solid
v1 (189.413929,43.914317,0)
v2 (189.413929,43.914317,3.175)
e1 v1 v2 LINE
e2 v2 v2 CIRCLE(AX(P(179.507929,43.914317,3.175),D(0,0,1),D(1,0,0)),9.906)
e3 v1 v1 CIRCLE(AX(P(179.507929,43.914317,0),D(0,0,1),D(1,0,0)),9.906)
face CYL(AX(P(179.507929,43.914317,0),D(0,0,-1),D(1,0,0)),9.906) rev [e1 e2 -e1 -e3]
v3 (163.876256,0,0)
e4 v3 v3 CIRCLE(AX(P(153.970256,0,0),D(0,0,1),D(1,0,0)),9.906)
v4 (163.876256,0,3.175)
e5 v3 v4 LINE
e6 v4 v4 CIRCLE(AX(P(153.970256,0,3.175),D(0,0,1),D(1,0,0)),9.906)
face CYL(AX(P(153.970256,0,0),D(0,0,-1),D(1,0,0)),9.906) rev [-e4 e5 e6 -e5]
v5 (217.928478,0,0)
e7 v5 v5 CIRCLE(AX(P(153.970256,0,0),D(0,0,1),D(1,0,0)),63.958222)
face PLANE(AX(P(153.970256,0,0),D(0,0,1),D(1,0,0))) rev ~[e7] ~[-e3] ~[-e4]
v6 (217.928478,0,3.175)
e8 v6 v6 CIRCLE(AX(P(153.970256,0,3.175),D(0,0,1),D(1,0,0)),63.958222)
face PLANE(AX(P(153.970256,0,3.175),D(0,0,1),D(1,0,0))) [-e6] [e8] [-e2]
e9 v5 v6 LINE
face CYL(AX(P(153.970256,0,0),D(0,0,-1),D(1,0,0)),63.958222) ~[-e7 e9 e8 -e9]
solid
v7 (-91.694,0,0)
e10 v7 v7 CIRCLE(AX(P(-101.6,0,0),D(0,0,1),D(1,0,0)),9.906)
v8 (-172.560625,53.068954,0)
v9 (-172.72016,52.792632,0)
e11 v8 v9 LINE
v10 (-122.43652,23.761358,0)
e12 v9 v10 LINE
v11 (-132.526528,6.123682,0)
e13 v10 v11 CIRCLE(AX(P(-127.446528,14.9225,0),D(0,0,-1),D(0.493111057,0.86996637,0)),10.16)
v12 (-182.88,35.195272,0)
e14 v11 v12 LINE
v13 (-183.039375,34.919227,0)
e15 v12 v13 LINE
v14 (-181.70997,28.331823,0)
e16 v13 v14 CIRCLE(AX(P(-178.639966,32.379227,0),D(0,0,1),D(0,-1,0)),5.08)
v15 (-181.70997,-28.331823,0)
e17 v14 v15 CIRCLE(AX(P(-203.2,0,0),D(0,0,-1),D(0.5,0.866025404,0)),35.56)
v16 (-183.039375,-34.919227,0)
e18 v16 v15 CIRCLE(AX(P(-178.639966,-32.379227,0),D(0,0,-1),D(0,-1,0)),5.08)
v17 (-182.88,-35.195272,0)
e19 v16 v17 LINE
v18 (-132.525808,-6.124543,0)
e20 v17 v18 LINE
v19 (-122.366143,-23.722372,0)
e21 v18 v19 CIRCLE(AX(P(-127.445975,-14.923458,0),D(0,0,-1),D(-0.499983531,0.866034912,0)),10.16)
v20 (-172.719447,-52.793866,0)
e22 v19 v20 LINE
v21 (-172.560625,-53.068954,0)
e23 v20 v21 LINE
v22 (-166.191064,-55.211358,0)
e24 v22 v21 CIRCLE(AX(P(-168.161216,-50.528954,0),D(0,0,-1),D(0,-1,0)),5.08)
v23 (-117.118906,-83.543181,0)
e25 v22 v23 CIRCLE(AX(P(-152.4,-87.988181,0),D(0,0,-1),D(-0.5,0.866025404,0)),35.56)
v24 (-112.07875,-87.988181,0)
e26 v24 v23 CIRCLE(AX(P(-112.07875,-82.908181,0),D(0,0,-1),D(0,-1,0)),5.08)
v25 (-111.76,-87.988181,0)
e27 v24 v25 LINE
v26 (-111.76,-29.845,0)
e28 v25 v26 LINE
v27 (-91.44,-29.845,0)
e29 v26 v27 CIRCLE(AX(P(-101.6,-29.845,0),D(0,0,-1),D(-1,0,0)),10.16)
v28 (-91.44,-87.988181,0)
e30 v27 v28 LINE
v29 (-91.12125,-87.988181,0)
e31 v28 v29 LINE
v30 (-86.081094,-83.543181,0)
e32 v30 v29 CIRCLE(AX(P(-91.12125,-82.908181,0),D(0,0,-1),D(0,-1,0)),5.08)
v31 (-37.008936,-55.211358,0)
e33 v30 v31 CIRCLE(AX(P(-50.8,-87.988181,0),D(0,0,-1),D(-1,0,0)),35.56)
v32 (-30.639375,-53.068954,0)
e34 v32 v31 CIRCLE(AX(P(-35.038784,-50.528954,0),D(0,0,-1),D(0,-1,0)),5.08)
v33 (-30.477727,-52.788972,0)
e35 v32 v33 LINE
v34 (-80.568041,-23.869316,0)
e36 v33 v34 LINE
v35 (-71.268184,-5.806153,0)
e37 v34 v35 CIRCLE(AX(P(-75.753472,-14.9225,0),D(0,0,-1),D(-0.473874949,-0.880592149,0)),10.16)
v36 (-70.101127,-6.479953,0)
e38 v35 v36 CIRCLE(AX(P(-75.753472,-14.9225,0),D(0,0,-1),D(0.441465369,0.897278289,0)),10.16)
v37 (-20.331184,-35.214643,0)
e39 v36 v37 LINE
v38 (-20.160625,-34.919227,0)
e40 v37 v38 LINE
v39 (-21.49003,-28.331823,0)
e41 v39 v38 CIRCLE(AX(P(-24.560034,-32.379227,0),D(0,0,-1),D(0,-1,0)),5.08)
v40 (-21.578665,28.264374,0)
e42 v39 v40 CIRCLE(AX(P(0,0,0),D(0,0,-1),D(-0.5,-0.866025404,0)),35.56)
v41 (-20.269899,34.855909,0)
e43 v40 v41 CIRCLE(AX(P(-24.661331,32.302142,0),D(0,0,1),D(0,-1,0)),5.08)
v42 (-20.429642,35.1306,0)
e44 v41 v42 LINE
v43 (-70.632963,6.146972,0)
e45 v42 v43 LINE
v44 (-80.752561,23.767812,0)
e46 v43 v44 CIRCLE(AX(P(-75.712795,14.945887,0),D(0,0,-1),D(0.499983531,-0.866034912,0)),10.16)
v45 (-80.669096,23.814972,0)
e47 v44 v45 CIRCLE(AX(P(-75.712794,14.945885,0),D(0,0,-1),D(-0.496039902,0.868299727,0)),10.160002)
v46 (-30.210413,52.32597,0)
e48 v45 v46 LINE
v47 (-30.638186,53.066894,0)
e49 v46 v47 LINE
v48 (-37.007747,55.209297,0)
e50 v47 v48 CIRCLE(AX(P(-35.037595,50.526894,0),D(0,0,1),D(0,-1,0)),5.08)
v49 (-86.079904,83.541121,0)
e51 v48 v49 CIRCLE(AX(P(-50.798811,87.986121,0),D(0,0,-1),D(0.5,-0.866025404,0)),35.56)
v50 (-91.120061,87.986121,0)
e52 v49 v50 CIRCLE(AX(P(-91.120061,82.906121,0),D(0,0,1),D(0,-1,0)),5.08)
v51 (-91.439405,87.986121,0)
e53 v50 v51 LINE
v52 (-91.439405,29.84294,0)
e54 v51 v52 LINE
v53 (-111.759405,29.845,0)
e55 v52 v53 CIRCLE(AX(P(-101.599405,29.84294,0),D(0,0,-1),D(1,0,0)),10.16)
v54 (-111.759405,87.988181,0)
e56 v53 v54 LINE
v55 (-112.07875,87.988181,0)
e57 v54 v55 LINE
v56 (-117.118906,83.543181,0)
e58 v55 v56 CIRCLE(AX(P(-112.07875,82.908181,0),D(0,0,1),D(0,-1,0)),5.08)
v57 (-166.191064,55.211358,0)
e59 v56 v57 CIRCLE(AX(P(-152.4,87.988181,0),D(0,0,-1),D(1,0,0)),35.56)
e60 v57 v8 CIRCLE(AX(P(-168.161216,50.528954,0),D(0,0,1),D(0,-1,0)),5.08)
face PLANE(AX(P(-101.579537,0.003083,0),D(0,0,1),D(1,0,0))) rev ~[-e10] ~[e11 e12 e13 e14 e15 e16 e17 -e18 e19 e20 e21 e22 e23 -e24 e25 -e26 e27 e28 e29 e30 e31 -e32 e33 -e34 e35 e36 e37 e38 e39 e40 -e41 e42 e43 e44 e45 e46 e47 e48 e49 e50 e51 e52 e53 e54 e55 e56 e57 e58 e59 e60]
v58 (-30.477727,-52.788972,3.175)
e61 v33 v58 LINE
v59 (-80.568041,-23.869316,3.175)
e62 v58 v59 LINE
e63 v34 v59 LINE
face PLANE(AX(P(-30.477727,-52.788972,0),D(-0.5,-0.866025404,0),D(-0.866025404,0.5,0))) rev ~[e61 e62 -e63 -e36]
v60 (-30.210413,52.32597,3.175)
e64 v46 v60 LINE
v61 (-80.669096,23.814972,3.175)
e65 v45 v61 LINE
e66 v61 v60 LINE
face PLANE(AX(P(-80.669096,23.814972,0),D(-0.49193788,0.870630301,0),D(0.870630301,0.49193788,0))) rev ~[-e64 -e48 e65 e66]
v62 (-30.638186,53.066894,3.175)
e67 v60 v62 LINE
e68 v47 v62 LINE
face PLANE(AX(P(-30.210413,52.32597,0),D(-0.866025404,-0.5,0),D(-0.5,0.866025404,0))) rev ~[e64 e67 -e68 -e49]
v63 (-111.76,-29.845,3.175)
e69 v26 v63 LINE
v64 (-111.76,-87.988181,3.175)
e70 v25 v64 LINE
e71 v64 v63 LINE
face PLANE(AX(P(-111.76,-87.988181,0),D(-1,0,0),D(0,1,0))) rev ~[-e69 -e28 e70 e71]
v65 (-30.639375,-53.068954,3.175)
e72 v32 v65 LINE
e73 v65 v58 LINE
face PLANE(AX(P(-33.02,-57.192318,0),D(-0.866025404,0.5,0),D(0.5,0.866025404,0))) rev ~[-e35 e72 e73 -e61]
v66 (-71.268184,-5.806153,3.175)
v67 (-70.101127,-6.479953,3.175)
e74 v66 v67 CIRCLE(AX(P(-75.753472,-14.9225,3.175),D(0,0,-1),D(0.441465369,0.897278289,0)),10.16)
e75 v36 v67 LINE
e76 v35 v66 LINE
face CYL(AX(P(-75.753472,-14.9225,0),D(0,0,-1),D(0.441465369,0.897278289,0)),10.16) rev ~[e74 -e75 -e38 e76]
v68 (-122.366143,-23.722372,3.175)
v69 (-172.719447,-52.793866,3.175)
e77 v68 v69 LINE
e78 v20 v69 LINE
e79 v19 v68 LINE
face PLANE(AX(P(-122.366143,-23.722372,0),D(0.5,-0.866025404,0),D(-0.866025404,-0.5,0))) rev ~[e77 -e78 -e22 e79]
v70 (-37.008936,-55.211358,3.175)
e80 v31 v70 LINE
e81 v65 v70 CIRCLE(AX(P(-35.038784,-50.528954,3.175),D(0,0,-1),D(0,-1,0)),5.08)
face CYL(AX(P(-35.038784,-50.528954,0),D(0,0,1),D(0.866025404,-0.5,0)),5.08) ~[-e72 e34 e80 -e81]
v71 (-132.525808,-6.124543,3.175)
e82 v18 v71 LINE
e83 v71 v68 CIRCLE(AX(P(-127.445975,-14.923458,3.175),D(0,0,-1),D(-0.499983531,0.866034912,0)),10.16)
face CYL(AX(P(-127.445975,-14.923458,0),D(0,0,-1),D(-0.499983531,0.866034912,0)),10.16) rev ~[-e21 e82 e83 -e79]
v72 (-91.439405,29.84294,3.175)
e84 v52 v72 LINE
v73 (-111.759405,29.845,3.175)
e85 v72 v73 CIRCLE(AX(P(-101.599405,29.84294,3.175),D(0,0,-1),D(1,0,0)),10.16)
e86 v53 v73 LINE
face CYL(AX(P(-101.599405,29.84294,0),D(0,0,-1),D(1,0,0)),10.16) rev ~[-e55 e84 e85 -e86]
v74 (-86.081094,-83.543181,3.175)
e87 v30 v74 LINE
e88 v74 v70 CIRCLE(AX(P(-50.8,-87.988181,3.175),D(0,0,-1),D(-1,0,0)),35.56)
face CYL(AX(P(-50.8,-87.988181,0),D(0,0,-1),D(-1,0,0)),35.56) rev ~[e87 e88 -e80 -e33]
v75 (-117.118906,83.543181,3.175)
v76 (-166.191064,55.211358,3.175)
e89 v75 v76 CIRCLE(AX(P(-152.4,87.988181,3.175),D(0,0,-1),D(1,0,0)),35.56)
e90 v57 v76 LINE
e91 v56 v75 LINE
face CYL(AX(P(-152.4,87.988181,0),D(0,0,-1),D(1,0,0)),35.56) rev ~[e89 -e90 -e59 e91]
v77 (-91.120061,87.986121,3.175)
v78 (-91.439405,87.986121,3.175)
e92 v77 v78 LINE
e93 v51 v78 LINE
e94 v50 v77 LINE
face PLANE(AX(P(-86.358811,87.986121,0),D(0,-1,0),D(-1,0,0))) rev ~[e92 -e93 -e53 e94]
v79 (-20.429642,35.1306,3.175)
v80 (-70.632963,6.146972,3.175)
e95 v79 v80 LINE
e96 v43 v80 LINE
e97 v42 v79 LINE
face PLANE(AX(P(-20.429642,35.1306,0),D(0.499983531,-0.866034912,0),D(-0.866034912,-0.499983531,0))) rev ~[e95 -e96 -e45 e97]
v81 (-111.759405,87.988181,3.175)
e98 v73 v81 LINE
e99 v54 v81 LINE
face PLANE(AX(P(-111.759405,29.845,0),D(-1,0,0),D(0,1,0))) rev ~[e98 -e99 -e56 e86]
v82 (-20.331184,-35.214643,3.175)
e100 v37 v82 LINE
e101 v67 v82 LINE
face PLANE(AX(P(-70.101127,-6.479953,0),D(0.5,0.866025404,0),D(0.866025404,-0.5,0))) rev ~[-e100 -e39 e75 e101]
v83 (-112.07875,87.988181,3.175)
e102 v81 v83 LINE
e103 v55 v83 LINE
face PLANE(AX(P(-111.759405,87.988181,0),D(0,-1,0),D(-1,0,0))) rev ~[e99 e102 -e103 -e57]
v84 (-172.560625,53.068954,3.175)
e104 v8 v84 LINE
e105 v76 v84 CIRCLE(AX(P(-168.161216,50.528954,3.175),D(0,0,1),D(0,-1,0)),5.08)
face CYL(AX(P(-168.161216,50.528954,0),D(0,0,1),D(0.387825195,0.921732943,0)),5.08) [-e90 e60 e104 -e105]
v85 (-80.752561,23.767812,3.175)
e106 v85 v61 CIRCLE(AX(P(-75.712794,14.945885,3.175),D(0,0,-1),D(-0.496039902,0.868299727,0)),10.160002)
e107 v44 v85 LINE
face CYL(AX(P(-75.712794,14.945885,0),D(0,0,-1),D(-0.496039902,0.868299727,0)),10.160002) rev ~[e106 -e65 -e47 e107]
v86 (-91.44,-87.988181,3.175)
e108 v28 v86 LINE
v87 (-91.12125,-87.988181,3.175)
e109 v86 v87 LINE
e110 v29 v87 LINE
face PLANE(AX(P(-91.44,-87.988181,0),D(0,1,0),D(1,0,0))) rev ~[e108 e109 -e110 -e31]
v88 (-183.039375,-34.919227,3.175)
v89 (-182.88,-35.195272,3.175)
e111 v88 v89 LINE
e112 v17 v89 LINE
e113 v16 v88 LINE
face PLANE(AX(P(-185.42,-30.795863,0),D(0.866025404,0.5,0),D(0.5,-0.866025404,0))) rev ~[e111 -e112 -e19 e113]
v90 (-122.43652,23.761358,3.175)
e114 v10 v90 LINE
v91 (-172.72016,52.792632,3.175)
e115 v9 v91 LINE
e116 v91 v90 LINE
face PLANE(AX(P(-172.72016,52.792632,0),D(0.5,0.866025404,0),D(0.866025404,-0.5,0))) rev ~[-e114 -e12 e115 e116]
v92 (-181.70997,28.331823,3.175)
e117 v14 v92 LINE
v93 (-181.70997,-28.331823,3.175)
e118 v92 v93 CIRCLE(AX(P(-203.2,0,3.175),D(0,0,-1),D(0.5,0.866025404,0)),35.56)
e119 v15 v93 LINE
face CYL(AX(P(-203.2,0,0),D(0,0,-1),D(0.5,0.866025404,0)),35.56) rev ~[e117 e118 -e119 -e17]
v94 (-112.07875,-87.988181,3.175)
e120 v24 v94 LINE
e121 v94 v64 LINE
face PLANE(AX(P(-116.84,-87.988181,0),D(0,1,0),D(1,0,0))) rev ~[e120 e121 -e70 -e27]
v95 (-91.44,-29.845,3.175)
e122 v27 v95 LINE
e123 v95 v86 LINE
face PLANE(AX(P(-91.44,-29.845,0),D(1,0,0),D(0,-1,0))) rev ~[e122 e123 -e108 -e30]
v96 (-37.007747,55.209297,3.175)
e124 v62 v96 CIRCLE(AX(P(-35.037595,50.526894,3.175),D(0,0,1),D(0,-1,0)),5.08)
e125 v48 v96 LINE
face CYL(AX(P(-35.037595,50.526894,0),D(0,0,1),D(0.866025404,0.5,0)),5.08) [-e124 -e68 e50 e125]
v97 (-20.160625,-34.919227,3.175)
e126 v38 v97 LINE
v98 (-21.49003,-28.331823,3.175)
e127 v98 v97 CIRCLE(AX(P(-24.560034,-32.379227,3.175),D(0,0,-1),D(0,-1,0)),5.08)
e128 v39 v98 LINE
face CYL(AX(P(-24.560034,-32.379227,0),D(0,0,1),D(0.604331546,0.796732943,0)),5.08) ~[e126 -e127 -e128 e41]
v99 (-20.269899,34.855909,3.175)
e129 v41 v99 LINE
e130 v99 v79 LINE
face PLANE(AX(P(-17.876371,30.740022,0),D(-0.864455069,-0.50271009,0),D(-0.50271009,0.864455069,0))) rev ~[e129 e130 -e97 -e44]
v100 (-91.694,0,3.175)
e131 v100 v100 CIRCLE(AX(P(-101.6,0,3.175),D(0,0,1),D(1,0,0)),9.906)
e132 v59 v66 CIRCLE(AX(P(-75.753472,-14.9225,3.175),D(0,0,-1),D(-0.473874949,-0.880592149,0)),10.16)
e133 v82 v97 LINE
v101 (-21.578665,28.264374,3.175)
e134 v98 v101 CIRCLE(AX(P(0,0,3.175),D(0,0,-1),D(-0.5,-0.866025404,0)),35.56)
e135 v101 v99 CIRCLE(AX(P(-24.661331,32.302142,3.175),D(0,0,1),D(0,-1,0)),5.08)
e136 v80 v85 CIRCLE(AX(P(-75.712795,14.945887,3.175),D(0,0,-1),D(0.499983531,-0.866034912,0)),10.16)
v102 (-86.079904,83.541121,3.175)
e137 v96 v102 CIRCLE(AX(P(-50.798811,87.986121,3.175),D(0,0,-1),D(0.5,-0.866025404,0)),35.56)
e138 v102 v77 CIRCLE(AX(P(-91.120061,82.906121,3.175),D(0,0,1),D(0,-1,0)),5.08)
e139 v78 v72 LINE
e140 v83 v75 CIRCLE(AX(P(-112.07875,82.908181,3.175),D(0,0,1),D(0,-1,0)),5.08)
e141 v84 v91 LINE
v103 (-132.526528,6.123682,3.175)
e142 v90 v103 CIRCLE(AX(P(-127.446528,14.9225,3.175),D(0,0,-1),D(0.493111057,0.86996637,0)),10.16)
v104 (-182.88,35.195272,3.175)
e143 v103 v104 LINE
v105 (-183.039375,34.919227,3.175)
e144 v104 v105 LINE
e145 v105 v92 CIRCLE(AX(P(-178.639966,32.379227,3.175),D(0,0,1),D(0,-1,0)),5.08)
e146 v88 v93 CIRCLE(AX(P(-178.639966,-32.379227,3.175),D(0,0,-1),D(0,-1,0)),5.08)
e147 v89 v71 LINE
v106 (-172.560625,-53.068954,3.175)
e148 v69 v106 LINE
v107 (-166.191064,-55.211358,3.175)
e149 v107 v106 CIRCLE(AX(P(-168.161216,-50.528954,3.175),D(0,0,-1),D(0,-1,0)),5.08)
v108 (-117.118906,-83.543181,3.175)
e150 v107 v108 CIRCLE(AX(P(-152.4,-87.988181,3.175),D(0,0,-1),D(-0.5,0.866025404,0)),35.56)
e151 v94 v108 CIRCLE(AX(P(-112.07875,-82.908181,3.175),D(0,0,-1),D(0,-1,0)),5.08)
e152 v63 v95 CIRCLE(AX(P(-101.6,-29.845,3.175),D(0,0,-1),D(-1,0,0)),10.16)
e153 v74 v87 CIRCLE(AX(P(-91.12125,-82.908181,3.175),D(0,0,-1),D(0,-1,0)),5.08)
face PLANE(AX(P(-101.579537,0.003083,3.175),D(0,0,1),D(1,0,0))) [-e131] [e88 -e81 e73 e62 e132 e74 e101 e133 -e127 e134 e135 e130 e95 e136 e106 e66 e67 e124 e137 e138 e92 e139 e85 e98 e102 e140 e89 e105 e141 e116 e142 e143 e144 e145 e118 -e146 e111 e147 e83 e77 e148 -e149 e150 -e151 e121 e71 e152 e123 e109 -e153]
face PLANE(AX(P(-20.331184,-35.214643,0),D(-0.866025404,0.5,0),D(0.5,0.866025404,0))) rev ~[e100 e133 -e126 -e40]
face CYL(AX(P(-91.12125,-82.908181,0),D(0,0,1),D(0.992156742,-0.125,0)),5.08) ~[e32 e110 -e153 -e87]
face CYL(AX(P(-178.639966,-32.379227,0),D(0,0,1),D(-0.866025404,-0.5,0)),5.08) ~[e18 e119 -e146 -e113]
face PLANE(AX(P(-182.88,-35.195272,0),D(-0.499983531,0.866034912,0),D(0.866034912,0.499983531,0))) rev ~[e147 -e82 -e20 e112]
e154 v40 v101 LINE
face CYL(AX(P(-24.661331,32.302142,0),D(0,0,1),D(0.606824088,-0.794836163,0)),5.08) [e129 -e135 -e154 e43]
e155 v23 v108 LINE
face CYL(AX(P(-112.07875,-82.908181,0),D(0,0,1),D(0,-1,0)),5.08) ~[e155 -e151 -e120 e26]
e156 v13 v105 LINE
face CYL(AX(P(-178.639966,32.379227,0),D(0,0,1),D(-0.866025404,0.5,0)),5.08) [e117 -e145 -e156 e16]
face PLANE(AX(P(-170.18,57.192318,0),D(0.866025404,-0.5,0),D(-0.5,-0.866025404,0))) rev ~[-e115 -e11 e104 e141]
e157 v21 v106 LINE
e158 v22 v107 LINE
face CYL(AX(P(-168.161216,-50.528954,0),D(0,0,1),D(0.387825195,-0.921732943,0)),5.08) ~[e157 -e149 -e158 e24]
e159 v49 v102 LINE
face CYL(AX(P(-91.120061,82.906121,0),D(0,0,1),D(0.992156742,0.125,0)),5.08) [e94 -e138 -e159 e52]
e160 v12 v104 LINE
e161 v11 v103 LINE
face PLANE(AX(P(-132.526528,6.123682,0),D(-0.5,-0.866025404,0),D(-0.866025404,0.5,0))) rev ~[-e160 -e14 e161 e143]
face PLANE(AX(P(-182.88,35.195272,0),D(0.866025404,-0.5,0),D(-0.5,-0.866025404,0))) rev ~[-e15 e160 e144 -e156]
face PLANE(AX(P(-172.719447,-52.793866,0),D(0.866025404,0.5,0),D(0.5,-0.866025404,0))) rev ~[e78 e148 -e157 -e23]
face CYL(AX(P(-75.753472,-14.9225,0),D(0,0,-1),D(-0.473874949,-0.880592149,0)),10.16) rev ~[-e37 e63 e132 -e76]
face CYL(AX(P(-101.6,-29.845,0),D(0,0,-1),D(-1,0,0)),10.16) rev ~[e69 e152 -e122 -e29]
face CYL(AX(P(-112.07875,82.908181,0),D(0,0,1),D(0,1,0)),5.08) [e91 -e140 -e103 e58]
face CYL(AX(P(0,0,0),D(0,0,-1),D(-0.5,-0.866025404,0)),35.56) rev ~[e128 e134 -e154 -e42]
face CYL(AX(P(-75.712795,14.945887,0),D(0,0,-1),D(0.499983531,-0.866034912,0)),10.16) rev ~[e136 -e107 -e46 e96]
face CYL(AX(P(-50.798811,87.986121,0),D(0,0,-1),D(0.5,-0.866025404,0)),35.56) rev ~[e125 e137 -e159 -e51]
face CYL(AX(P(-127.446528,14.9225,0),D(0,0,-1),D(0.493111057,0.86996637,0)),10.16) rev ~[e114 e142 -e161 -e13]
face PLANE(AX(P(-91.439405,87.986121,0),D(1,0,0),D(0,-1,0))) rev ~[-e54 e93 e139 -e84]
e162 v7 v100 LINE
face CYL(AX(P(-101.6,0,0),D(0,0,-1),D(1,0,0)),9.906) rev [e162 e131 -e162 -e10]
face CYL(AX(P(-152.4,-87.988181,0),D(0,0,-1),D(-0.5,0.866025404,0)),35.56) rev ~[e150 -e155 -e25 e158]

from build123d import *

# Parameters (mm, degrees)
F0_R     = 9.906
F1_DEPTH = 3.175
F2_R     = 5.08
F0_R_2   = 63.9582216699
F0_R_3   = 33.02
F3_DEPTH = 3.175


# Not quite as in the source:
# - a length typed as a fraction of an inch, garbled in the dataset ("3 / 203.2 mm" for 3/8 in), is restored
# - a feature names something its author has since deleted; it is built from what else it names


with BuildPart() as f1:
    # F0 (on Top) → F1 (new body)
    with BuildSketch(Plane.XY):
        with BuildLine():
            ThreePointArc((-17.78, -30.7958633586), (-35.5599563921, -0.0556901267), (-17.8763707949, 30.7400222382))
            Line((-17.8763707949, 30.7400222382), (-20.4296415334, 35.1306001794))
            Line((-20.4296415334, 35.1306001794), (-70.6329627114, 6.1469720917))
            ThreePointArc((-70.6329627114, 6.1469720917), (-84.5232381264, 9.8860746707), (-80.7525608015, 23.7678120156))
            ThreePointArc((-80.7525608015, 23.7678120156), (-80.7108842522, 23.7914906594), (-80.6690964546, 23.8149724163))
            Line((-80.6690964546, 23.8149724163), (-30.2104125797, 52.3259695061))
            Line((-30.2104125797, 52.3259695061), (-33.0188105519, 57.1902574851))
            ThreePointArc((-33.0188105519, 57.1902574851), (-68.5788105527, 57.1902574837), (-86.3588105535, 87.9861208428))
            Line((-86.3588105535, 87.9861208428), (-91.4394053355, 87.9861208428))
            Line((-91.4394053355, 87.9861208428), (-91.4394053355, 29.8429398183))
            ThreePointArc((-91.4394053355, 29.8429398183), (-101.6004354264, 19.6829398705), (-111.7594051266, 29.845))
            Line((-111.7594051266, 29.845), (-111.7594051266, 87.9881810245))
            Line((-111.7594051266, 87.9881810245), (-116.84, 87.9881810245))
            ThreePointArc((-116.84, 87.9881810245), (-134.62, 57.1923176659), (-170.18, 57.1923176659))
            Line((-170.18, 57.1923176659), (-172.7201599914, 52.7926315014))
            Line((-172.7201599914, 52.7926315014), (-122.4365198362, 23.7613583219))
            ThreePointArc((-122.4365198362, 23.7613583219), (-118.627620527, 9.8774561073), (-132.5265281759, 6.1236818976))
            Line((-132.5265281759, 6.1236818976), (-182.88, 35.1952724098))
            Line((-182.88, 35.1952724098), (-185.42, 30.7958633586))
            ThreePointArc((-185.42, 30.7958633586), (-167.64, 0), (-185.42, -30.7958633586))
            Line((-185.42, -30.7958633586), (-182.8800000009, -35.1952724082))
            Line((-182.8800000009, -35.1952724082), (-132.5258080212, -6.1245428478))
            ThreePointArc((-132.5258080212, -6.1245428478), (-118.6470606402, -9.8436248763), (-122.3661426686, -23.7223722573))
            Line((-122.3661426686, -23.7223722573), (-172.7194471607, -52.7938661604))
            Line((-172.7194471607, -52.7938661604), (-170.18, -57.1923176659))
            ThreePointArc((-170.18, -57.1923176659), (-134.62, -57.1923176659), (-116.84, -87.9881810245))
            Line((-116.84, -87.9881810245), (-111.76, -87.9881810245))
            Line((-111.76, -87.9881810245), (-111.76, -29.845))
            ThreePointArc((-111.76, -29.845), (-101.6, -19.685), (-91.44, -29.845))
            Line((-91.44, -29.845), (-91.4399999997, -87.9881810245))
            Line((-91.4399999997, -87.9881810245), (-86.36, -87.9881810245))
            ThreePointArc((-86.36, -87.9881810245), (-68.58, -57.1923176659), (-33.02, -57.1923176659))
            Line((-33.02, -57.1923176659), (-30.4777274407, -52.7889724266))
            Line((-30.4777274407, -52.7889724266), (-80.5680413022, -23.8693162349))
            ThreePointArc((-80.5680413022, -23.8693162349), (-84.7865541797, -10.2717986383), (-71.2681836795, -5.8061525812))
            ThreePointArc((-71.2681836795, -5.8061525812), (-70.6734718241, -6.1236818976), (-70.1011274419, -6.4799528141))
            Line((-70.1011274419, -6.4799528141), (-20.3311837367, -35.2146432099))
            Line((-20.3311837367, -35.2146432099), (-17.78, -30.7958633586))
        make_face()
        with Locations((-101.6, 0)):
            Circle(F0_R, mode=Mode.SUBTRACT)
    extrude(amount=F1_DEPTH)

    # F2
    f2_edges = [f1.edges().sort_by_distance(p)[0] for p in [
        (-17.876371, 30.740022, 1.5875),
        (-17.78, -30.795863, 1.5875),
        (-33.02, -57.192318, 1.5875),
        (-86.36, -87.988181, 1.5875),
        (-116.84, -87.988181, 1.5875),
        (-170.18, -57.192318, 1.5875),
        (-185.42, -30.795863, 1.5875),
        (-185.42, 30.795863, 1.5875),
        (-116.84, 87.988181, 1.5875),
        (-86.358811, 87.986121, 1.5875),
        (-33.018811, 57.190257, 1.5875),
        (-170.18, 57.192318, 1.5875),
    ]]
    fillet(f2_edges, radius=F2_R)


with BuildPart() as f3:
    # F0 (on Top) → F3 (new body)
    with BuildSketch(Plane.XY):
        with Locations((153.9702564478, 0)):
            Circle(F0_R_2)
        with Locations((153.9702564478, 0)):
            Circle(F0_R_3, mode=Mode.SUBTRACT)
        with Locations((179.5079290119, 43.9143174831)):
            Circle(F0_R, mode=Mode.SUBTRACT)
        with Locations((153.9702564478, 0)):
            Circle(F0_R_3)
        with Locations((153.9702564478, 0)):
            Circle(F0_R, mode=Mode.SUBTRACT)
    extrude(amount=F3_DEPTH)


solid = Compound([f1.part, f3.part])
